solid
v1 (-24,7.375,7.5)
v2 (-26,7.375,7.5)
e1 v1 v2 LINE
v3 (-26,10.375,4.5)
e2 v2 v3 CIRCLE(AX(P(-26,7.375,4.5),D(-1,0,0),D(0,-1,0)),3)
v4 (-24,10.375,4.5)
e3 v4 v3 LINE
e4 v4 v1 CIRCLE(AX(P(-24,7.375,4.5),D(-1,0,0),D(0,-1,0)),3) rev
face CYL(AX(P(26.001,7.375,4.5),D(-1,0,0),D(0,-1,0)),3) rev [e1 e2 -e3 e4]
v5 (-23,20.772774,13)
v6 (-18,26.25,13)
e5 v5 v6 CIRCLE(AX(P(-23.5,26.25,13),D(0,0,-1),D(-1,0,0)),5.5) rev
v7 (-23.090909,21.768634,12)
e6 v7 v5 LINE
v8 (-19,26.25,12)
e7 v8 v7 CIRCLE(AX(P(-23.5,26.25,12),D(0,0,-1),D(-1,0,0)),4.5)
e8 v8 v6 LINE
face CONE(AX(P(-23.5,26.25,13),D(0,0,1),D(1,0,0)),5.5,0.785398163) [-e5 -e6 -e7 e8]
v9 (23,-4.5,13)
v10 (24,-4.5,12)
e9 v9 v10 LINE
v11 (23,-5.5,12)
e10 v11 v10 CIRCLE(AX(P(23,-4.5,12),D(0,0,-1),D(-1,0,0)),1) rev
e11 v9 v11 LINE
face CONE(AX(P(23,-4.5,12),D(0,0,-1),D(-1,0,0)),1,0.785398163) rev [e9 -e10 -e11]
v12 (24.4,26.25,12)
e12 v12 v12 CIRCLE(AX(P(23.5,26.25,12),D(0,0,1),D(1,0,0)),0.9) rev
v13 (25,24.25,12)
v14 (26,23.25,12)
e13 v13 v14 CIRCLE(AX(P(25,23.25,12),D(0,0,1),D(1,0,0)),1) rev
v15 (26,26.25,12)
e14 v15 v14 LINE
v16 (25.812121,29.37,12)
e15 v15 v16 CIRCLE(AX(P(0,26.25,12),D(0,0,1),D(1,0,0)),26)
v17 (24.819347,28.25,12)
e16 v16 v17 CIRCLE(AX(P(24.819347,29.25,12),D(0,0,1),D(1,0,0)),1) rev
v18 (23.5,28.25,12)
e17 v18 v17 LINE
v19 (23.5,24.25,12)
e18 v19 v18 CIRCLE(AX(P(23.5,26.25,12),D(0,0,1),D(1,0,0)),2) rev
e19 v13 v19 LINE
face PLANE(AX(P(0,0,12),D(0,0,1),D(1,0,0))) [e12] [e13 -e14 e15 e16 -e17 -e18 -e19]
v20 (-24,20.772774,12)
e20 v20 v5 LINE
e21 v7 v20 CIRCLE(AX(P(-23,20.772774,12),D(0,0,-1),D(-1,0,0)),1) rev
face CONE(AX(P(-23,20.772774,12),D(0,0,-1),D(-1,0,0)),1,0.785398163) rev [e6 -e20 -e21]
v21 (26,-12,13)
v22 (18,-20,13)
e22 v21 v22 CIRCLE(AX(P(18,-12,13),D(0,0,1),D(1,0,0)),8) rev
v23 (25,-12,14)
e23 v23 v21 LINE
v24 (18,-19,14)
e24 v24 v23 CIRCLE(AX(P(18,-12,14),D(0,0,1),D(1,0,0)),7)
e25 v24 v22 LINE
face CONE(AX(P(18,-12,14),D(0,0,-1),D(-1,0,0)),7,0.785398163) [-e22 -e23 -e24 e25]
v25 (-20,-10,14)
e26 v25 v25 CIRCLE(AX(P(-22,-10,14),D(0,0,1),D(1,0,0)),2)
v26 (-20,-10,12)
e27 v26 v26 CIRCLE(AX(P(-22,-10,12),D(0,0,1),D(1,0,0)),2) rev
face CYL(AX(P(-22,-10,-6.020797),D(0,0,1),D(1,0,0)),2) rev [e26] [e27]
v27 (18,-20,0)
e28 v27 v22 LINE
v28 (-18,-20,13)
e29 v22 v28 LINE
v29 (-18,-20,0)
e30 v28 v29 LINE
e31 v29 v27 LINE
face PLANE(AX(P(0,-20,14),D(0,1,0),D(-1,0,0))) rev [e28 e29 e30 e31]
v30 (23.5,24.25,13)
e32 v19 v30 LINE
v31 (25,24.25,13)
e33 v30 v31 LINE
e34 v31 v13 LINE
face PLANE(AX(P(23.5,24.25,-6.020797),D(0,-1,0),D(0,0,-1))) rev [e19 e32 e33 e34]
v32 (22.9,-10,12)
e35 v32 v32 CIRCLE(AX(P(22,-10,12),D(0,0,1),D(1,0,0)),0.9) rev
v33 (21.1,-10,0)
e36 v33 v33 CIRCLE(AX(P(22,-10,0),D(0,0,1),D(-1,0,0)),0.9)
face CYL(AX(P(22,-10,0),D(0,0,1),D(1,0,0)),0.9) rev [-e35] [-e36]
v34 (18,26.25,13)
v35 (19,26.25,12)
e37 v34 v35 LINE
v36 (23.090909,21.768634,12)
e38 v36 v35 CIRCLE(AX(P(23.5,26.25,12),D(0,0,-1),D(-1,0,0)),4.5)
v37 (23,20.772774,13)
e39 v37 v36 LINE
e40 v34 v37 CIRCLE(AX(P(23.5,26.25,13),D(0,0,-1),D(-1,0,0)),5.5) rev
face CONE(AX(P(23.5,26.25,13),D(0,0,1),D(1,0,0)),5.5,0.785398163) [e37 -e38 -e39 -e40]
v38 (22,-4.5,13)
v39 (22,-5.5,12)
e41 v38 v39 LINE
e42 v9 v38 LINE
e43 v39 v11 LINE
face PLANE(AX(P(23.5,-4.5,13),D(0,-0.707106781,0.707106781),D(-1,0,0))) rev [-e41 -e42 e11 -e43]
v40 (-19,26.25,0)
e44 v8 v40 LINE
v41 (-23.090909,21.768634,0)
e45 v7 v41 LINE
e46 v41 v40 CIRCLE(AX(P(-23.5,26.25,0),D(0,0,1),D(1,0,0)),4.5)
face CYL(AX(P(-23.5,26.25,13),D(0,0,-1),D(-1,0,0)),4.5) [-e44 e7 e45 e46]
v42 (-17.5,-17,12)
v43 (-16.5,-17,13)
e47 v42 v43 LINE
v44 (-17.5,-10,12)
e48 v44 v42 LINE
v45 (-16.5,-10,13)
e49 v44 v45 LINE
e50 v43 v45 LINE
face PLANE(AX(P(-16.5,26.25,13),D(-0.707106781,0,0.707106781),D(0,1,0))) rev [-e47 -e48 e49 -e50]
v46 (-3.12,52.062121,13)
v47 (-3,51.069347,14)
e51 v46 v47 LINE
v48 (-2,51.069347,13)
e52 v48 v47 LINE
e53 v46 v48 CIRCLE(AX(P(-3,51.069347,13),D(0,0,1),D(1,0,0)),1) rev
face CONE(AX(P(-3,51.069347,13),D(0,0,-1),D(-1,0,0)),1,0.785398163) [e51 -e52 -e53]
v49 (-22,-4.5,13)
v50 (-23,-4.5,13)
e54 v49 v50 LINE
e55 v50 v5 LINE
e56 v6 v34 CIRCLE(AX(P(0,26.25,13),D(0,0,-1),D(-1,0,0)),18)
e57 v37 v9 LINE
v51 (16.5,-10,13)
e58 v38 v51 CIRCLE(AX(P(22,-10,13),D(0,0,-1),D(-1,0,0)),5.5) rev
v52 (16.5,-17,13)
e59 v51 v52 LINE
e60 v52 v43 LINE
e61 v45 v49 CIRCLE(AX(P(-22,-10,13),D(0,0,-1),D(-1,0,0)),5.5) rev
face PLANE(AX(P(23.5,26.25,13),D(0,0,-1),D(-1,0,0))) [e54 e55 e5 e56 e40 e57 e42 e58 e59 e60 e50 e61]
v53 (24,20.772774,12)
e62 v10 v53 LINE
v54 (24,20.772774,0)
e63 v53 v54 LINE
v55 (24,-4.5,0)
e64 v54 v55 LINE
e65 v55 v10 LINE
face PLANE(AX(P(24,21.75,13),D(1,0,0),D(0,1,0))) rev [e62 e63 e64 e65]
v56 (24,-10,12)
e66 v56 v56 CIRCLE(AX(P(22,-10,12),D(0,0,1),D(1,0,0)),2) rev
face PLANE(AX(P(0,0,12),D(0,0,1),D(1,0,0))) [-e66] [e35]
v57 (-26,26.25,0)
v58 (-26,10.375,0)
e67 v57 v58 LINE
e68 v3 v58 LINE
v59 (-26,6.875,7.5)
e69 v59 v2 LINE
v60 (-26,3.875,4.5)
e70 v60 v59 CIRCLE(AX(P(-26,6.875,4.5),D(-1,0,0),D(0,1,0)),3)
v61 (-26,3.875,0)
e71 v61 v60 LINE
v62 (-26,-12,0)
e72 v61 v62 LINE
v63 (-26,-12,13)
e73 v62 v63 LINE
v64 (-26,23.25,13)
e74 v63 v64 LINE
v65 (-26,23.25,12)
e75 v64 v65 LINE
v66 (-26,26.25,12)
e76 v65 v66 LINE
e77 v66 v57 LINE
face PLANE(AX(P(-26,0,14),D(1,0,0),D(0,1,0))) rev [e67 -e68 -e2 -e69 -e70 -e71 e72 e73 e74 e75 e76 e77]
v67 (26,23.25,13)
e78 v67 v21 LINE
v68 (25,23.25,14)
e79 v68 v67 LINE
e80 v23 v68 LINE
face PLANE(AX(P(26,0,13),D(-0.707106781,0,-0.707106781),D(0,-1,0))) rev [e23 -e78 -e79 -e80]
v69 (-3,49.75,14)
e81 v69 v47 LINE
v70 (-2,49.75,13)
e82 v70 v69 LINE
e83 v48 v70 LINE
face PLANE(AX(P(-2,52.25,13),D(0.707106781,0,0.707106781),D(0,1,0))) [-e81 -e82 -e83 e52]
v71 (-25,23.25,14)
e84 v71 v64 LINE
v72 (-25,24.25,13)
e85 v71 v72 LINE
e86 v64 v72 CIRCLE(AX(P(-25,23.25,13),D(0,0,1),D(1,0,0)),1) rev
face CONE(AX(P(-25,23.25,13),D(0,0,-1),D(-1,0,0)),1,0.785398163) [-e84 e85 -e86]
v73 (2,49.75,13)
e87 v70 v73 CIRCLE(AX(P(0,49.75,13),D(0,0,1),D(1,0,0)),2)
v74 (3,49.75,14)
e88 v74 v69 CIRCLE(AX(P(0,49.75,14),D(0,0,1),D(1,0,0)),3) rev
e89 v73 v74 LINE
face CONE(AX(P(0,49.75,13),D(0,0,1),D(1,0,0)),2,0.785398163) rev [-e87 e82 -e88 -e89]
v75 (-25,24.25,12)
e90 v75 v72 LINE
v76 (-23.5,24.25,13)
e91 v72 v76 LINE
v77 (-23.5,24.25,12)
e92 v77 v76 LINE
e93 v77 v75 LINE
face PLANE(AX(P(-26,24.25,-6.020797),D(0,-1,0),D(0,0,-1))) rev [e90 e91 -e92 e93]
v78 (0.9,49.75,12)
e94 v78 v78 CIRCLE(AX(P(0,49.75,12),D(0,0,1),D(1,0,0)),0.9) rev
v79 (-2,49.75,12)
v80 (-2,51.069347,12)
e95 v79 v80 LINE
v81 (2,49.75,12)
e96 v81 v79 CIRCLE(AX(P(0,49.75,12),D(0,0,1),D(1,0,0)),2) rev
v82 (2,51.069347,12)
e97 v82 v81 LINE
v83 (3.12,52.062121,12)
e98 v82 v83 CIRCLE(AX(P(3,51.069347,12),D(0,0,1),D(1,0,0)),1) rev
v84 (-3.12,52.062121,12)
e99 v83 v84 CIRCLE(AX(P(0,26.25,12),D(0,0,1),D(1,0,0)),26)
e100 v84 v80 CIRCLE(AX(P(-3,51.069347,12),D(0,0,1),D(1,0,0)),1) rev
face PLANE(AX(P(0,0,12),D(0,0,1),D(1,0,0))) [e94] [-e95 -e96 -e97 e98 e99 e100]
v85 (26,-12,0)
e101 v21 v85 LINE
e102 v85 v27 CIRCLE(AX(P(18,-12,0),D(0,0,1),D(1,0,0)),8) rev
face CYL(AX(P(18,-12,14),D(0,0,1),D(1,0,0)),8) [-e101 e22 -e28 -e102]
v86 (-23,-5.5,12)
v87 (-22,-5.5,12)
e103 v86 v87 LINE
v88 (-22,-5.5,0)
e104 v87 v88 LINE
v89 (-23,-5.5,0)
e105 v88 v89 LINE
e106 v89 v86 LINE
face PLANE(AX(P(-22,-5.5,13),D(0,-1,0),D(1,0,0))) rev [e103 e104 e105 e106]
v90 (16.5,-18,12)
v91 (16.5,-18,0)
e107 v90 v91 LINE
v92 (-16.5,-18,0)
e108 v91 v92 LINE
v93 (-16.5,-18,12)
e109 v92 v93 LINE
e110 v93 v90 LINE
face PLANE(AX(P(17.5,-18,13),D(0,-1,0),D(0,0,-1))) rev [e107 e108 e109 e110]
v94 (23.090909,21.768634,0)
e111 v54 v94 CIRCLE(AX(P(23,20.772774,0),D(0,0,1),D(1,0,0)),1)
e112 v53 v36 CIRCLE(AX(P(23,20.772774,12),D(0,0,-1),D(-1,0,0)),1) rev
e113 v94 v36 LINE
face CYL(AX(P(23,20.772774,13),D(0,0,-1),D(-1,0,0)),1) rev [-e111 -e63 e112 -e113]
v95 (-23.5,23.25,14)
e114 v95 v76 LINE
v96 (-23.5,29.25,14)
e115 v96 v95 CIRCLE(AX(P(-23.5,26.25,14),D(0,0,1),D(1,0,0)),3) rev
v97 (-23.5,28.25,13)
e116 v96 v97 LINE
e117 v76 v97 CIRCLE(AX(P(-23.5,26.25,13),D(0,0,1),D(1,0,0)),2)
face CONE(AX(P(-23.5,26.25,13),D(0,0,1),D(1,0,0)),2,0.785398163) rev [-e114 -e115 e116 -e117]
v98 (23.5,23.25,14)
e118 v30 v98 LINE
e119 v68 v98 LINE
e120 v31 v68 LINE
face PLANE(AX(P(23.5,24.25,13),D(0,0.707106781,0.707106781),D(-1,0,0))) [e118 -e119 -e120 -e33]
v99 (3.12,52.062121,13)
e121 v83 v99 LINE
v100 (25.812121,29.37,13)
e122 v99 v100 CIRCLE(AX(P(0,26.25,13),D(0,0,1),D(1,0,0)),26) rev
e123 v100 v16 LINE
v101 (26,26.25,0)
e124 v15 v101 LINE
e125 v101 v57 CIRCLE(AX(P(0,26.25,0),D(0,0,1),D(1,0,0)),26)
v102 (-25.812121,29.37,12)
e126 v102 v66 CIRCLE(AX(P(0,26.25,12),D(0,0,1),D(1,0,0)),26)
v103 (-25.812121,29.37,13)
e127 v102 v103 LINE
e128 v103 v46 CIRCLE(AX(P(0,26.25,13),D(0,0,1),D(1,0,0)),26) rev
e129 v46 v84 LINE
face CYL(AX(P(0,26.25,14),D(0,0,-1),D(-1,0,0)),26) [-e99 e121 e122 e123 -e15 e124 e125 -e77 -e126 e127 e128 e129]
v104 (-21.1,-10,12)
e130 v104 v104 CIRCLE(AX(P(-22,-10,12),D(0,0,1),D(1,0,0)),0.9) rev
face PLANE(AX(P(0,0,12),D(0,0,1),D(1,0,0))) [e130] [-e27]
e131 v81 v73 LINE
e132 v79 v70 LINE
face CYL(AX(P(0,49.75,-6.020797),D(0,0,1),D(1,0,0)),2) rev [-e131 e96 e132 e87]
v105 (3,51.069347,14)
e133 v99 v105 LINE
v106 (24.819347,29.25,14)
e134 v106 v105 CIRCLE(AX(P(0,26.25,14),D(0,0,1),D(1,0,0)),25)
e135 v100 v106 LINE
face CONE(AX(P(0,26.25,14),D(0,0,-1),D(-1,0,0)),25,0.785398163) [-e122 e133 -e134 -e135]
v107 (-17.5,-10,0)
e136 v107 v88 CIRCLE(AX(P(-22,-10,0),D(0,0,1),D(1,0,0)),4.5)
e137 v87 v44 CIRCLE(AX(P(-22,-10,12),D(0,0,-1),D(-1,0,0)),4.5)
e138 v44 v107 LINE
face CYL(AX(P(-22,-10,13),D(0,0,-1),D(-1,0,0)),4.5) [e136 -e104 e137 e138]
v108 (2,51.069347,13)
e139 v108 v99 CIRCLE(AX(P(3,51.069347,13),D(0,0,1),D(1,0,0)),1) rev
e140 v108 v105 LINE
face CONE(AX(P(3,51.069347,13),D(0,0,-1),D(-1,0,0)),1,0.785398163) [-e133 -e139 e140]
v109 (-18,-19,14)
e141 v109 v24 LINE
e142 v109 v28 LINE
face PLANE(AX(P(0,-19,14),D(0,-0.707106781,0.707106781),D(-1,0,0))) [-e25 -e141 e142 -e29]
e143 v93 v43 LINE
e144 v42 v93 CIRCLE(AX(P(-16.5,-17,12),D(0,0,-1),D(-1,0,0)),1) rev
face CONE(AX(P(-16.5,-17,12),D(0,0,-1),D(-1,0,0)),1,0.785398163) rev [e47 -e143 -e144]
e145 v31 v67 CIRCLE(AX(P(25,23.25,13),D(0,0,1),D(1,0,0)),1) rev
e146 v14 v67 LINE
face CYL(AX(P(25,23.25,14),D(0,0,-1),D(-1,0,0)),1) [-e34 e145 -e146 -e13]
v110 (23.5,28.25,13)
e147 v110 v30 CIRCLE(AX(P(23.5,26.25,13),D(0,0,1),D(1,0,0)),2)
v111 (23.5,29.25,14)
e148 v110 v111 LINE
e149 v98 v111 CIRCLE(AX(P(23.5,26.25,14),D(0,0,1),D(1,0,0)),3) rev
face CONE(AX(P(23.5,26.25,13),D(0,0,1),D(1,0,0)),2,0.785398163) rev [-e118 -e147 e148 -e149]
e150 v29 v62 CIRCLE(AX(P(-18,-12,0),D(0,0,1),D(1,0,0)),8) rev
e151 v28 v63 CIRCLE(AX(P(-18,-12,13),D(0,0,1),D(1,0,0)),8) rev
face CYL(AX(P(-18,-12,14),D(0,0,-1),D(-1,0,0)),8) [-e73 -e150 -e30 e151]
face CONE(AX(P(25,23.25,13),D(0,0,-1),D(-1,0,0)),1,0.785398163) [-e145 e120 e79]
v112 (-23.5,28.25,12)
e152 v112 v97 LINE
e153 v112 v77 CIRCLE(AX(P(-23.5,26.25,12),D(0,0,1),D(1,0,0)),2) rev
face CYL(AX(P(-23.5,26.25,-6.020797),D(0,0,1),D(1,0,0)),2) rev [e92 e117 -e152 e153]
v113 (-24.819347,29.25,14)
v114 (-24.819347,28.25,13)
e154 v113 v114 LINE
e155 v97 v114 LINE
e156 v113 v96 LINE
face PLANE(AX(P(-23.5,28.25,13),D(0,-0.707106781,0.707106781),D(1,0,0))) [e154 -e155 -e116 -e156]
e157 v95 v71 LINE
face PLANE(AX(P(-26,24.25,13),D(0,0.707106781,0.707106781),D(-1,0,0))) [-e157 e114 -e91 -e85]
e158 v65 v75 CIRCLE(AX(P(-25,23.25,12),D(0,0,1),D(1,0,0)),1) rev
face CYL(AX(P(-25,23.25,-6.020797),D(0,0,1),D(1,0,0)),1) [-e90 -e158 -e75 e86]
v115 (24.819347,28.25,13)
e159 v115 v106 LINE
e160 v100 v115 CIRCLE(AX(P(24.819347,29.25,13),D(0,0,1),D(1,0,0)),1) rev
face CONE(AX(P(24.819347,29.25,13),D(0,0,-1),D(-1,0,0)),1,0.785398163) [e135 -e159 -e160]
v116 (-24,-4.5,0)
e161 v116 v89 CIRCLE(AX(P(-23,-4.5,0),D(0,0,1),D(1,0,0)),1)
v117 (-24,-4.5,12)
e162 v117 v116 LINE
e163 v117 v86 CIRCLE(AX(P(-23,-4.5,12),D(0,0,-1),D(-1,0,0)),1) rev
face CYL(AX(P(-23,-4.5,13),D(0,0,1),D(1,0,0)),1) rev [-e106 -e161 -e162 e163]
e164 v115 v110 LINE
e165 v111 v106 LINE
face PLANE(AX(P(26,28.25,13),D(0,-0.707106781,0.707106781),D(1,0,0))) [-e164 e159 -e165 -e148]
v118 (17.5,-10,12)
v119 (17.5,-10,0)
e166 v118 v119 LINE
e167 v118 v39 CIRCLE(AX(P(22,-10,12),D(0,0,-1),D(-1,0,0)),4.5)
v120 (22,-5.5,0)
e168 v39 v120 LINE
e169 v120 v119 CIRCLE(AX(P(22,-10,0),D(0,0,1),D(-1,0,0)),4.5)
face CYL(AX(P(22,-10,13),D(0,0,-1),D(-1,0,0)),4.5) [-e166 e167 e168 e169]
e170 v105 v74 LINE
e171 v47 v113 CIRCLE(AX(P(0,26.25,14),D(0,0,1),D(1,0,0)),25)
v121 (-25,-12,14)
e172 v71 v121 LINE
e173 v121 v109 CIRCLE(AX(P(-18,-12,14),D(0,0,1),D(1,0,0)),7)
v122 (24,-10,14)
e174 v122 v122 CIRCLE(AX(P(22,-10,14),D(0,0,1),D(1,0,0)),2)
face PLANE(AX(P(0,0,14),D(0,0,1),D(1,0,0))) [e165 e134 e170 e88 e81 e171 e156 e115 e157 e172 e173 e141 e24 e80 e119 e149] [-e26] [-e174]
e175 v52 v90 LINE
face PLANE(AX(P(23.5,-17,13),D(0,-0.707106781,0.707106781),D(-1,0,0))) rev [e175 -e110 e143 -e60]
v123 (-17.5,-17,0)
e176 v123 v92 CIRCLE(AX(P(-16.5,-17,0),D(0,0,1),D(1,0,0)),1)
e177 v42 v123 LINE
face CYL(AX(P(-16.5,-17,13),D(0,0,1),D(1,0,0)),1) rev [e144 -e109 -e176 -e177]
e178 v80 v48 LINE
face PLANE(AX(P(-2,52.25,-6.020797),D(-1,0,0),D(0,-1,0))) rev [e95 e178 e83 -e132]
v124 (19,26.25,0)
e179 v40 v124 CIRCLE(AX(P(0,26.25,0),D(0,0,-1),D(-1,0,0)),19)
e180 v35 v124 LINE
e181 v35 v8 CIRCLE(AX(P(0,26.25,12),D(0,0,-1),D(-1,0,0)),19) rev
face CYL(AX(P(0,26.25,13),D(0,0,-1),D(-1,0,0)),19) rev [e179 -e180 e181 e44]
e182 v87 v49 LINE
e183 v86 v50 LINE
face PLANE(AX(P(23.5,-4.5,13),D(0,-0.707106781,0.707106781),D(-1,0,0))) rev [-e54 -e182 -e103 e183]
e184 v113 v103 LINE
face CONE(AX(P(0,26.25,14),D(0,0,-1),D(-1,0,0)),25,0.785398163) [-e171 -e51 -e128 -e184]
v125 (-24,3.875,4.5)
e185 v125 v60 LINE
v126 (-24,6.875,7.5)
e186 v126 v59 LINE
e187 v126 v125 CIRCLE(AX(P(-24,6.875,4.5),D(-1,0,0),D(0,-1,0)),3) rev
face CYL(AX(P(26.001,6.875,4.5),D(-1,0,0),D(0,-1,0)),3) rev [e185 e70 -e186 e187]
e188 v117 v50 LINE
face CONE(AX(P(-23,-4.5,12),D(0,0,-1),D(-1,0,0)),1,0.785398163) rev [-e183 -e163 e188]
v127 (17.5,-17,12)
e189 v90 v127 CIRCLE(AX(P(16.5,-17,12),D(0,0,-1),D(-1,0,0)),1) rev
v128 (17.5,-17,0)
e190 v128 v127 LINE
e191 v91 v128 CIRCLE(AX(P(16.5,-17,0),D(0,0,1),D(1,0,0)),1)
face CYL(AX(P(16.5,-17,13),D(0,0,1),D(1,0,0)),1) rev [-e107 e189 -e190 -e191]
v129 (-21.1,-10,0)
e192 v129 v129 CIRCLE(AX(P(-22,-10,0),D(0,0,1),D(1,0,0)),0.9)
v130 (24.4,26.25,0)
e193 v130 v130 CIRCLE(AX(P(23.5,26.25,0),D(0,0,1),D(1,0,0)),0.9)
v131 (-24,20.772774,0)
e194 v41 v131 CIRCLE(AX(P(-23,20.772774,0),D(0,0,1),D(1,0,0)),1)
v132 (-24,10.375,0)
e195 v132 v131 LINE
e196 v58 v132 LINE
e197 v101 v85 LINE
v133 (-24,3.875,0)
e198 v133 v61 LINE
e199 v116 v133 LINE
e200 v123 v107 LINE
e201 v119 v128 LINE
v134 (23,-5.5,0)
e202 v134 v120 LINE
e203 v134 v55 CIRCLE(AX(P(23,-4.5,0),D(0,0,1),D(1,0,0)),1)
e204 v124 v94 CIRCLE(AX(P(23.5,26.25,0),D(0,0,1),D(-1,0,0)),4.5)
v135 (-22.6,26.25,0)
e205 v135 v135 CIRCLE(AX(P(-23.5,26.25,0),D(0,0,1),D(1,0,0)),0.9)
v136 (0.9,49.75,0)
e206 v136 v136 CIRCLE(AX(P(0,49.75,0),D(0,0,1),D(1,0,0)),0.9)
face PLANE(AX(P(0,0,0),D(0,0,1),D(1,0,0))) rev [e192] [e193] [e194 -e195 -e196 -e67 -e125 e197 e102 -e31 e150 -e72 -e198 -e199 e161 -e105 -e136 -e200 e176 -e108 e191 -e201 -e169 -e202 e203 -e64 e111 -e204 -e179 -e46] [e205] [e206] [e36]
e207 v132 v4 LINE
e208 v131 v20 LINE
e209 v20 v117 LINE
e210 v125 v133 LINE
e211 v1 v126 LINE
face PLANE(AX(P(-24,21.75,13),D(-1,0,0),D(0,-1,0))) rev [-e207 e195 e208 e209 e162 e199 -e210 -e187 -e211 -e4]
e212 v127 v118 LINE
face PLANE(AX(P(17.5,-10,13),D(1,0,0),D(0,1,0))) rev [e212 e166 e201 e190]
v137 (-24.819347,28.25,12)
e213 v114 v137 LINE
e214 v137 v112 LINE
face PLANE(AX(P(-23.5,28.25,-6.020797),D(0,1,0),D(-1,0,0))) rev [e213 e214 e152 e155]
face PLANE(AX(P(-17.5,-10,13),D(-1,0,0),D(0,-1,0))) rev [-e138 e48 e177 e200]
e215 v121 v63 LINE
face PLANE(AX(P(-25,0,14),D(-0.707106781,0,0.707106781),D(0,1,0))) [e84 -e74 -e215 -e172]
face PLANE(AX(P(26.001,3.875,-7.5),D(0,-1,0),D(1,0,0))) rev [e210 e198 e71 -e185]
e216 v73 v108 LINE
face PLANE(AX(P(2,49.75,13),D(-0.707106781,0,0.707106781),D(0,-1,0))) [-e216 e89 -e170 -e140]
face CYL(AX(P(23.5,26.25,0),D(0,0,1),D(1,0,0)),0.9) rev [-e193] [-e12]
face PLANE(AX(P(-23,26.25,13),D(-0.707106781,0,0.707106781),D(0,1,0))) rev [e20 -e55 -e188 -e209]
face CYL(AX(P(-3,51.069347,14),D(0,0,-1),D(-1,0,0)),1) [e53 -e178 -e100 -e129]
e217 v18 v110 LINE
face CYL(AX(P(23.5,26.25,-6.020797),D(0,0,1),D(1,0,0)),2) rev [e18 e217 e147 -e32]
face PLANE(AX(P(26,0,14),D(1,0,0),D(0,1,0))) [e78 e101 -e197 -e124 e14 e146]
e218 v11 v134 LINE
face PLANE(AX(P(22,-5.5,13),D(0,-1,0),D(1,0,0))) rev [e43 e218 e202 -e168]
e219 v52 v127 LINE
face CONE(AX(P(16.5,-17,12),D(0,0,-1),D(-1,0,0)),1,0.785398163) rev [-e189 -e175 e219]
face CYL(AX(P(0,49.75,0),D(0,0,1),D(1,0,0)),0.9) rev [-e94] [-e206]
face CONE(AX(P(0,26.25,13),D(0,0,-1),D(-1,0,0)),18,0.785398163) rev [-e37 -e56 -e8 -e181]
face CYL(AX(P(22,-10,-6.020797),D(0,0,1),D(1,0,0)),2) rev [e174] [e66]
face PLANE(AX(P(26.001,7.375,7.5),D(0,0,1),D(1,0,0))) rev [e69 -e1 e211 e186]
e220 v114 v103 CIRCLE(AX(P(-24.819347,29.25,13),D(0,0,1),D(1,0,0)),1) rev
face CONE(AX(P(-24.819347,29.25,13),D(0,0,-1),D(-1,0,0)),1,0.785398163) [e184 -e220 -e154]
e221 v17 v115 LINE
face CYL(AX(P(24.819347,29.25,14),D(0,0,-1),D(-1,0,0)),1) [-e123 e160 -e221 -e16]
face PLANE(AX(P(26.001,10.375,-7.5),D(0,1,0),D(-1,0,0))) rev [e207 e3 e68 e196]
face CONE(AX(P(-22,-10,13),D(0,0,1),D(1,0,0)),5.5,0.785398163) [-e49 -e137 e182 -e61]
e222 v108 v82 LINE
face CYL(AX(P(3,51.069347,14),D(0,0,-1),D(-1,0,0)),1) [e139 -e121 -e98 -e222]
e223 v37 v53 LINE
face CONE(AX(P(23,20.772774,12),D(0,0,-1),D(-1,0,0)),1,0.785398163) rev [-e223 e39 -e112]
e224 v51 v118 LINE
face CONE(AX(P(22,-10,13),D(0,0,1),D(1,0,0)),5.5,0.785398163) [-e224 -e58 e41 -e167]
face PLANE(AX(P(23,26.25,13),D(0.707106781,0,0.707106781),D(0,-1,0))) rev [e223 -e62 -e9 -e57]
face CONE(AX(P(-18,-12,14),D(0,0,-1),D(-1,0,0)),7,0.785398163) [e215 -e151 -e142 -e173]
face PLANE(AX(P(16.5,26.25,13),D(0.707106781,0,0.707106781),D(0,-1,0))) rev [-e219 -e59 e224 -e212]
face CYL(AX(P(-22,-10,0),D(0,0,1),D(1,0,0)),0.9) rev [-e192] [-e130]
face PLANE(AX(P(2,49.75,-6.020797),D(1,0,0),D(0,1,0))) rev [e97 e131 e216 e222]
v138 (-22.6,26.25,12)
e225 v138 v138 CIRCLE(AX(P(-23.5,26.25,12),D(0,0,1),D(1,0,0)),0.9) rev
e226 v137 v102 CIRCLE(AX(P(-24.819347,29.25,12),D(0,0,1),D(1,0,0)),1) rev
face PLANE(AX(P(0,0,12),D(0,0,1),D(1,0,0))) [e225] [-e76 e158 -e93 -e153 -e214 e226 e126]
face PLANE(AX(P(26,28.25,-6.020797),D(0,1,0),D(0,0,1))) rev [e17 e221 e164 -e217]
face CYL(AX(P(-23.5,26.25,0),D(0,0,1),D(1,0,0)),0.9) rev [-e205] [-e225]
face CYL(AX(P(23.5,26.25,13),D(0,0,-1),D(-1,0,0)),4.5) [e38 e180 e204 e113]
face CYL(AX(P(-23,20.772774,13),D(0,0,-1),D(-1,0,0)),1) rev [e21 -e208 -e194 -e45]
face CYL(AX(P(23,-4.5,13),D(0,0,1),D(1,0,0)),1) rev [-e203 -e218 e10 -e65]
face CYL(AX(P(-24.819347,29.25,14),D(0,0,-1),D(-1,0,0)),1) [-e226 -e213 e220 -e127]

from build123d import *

# Parameters (mm, degrees)
SKETCH_2_R          = 19
SKETCH_2_R_2        = 2.75
EXTRUDE_1_DEPTH     = 14
SKETCH_3_R          = 21.125
CUT_EXTRUDE_1_DEPTH = 12.15
FILLET_1_R          = 8
SKETCH_5_R          = 0.9
CUT_EXTRUDE_3_DEPTH = 61.017185039
SKETCH_6_R          = 21.125
SKETCH_6_R_2        = 2.75
EXTRUDE_2_DEPTH     = 14
CUT_EXTRUDE_4_DEPTH = 13
SKETCH_8_R          = 2
CUT_EXTRUDE_5_DEPTH = 2
FILLET_2_R          = 1
CUT_EXTRUDE_6_REACH = 77.034
CHAMFER_1_SIZE      = 1


with BuildPart() as part:
    # Эскиз2 → Бобышка-Вытянуть1 (new body)
    with BuildSketch(Plane.XY):
        with BuildLine():
            ThreePointArc((26, 26.25), (0, 52.25), (-26, 26.25))
            Line((-26, 26.25), (-26, -20))
            Line((-26, -20), (26, -20))
            Line((26, -20), (26, 26.25))
        make_face()
        with Locations((0, 26.25)):
            Circle(SKETCH_2_R, mode=Mode.SUBTRACT)
        with Locations((12, -10)):
            Circle(SKETCH_2_R_2, mode=Mode.SUBTRACT)
        with Locations((-12, -10)):
            Circle(SKETCH_2_R_2, mode=Mode.SUBTRACT)
    extrude(amount=EXTRUDE_1_DEPTH)

    # Эскиз3 → Вырез-Вытянуть1 (cut)
    with BuildSketch(Plane.XY.offset(14)):
        with Locations((0, 26.25)):
            Circle(SKETCH_3_R)
    extrude(amount=-CUT_EXTRUDE_1_DEPTH, mode=Mode.SUBTRACT)

    # Скругление1
    fillet_1_edges = [part.edges().sort_by_distance(p)[0] for p in [
        (26, -20, 7),
        (-26, -20, 7),
    ]]
    fillet(fillet_1_edges, radius=FILLET_1_R)

    # Эскиз5 → Вырез-Вытянуть3 (cut, through all)
    with BuildSketch(Plane.XY.offset(14)):
        with Locations((0, 49.75)):
            Circle(SKETCH_5_R)
        with Locations((-23.5, 26.25)):
            Circle(SKETCH_5_R)
        with Locations((23.5, 26.25)):
            Circle(SKETCH_5_R)
        with Locations((-22, -10)):
            Circle(SKETCH_5_R)
        with Locations(Location((22, -10, 0), (0, 0, 180))):
            Circle(SKETCH_5_R)
    extrude(amount=-CUT_EXTRUDE_3_DEPTH, mode=Mode.SUBTRACT)

    # Эскиз6 → Бобышка-Вытянуть2 (add, through all)
    with BuildSketch(Plane.XY.offset(14)):
        with Locations((0, 26.25)):
            Circle(SKETCH_6_R)
        with Locations((-12, -10)):
            Circle(SKETCH_6_R_2)
        with Locations((12, -10)):
            Circle(SKETCH_6_R_2)
    extrude(amount=-EXTRUDE_2_DEPTH)

    # Эскиз7 → Вырез-Вытянуть4 (cut)
    with BuildSketch(Plane(origin=(0, 0, 0), x_dir=(-1, 0, 0), z_dir=(0, 0, -1))):
        with BuildLine():
            Line((-23.5, 21.75), (-24, 21.75))
            Line((-24, 21.75), (-24, -5.5))
            Line((-24, -5.5), (-22, -5.5))
            ThreePointArc((-22, -5.5), (-18.818019485, -6.818019485), (-17.5, -10))
            Line((-17.5, -10), (-17.5, -18))
            Line((-17.5, -18), (17.5, -18))
            Line((17.5, -18), (17.5, -10))
            ThreePointArc((17.5, -10), (18.818019485, -6.818019485), (22, -5.5))
            Line((22, -5.5), (24, -5.5))
            Line((24, -5.5), (24, 21.75))
            Line((24, 21.75), (23.5, 21.75))
            ThreePointArc((23.5, 21.75), (20.318019485, 23.068019485), (19, 26.25))
            ThreePointArc((19, 26.25), (0, 45.25), (-19, 26.25))
            ThreePointArc((-19, 26.25), (-20.318019485, 23.068019485), (-23.5, 21.75))
        make_face()
    extrude(amount=-CUT_EXTRUDE_4_DEPTH, mode=Mode.SUBTRACT)

    # Эскиз8 → Вырез-Вытянуть5 (cut)
    with BuildSketch(Plane.XY.offset(14)):
        with Locations((-22, -10)):
            Circle(SKETCH_8_R)
        with Locations((22, -10)):
            Circle(SKETCH_8_R)
        with BuildLine():
            Line((2, 49.75), (2, 52.25))
            Line((2, 52.25), (-2, 52.25))
            Line((-2, 52.25), (-2, 49.75))
            ThreePointArc((-2, 49.75), (0, 47.75), (2, 49.75))
        make_face()
        with BuildLine():
            Line((26, 28.25), (23.5, 28.25))
            ThreePointArc((23.5, 28.25), (21.5, 26.25), (23.5, 24.25))
            Line((23.5, 24.25), (26, 24.25))
            Line((26, 24.25), (26, 28.25))
        make_face()
        with BuildLine():
            Line((-26, 24.25), (-23.5, 24.25))
            ThreePointArc((-23.5, 24.25), (-21.5, 26.25), (-23.5, 28.25))
            Line((-23.5, 28.25), (-26, 28.25))
            Line((-26, 28.25), (-26, 24.25))
        make_face()
    extrude(amount=-CUT_EXTRUDE_5_DEPTH, mode=Mode.SUBTRACT)

    # Скругление2
    fillet_2_edges = [part.edges().sort_by_distance(p)[0] for p in [
        (24, -5.5, 6.5),
        (17.5, -18, 6.5),
        (-17.5, -18, 6.5),
        (-24, -5.5, 6.5),
        (-24, 21.75, 6.5),
        (24, 21.75, 6.5),
        (26, 24.25, 13),
        (25.922962794, 28.25, 13),
        (2, 52.172962794, 13),
        (-2, 52.172962794, 13),
        (-26, 24.25, 13),
        (-25.922962794, 28.25, 13),
    ]]
    fillet(fillet_2_edges, radius=FILLET_2_R)

    # Эскиз9 → Вырез-Вытянуть6 (cut, up to next)
    with BuildSketch(Plane.ZY.offset(26), mode=Mode.PRIVATE) as cut_extrude_6_sk1:
        with BuildLine():
            Line((-7.5, 10.375), (4.5, 10.375))
            ThreePointArc((4.5, 10.375), (6.621320344, 9.496320344), (7.5, 7.375))
            Line((7.5, 7.375), (7.5, 6.875))
            ThreePointArc((7.5, 6.875), (6.621320344, 4.753679656), (4.5, 3.875))
            Line((4.5, 3.875), (-7.5, 3.875))
            Line((-7.5, 3.875), (-7.5, 10.375))
        make_face()
    cut_extrude_6_tool1 = extrude(cut_extrude_6_sk1.sketch, amount=-CUT_EXTRUDE_6_REACH, mode=Mode.PRIVATE) & part.part
    add(cut_extrude_6_tool1.solids().sort_by_distance((-26, 7.125, -0.281755))[0], mode=Mode.SUBTRACT)

    # Фаска1
    chamfer_1_edges = [part.edges().sort_by_distance(p)[0] for p in [
        (2, 50.409673646, 14),
        (0, 47.75, 14),
        (21.5, 26.25, 14),
        (24.25, 24.25, 14),
        (-24.159673646, 28.25, 14),
        (-21.5, 26.25, 14),
        (22.5, -5.5, 13),
        (24, 8.136387212, 13),
        (0, -18, 13),
        (-17.5, -13.5, 13),
        (-24, 8.136387212, 13),
        (-20.176529744, 23.216100619, 13),
        (23.738548946, 21.446974287, 13),
        (-23.738548945, 21.446974288, 13),
        (-23.707106781, -5.207106781, 13),
        (-17.207106781, -17.707106781, 13),
        (17.207106781, -17.707106781, 13),
        (23.707106781, -5.207106781, 13),
        (26, 5.625, 14),
        (-2, 50.409673646, 14),
        (-18.384776311, 44.634776311, 14),
        (-24.25, 24.25, 14),
        (-26, 5.625, 14),
        (24.159673646, 28.25, 14),
        (18.384776311, 44.634776311, 14),
        (-25.567678769, 28.586675042, 14),
        (-25.707106781, 23.957106781, 14),
        (-2.336675042, 51.817678769, 14),
        (2.336675042, 51.817678769, 14),
        (25.567678769, 28.586675042, 14),
        (25.707106781, 23.957106781, 14),
        (0, -20, 14),
        (23.656854249, -17.656854249, 14),
        (-23.656854249, -17.656854249, 14),
        (20.176529744, 23.216100619, 13),
        (0, 45.25, 13),
        (-22.5, -5.5, 13),
        (-18.818019485, -6.818019485, 13),
        (17.5, -13.5, 13),
        (18.818019485, -6.818019485, 13),
    ]]
    chamfer(chamfer_1_edges, length=CHAMFER_1_SIZE - 0.0001)  # a hair under: the kernel refuses the full size


solid = part.part
